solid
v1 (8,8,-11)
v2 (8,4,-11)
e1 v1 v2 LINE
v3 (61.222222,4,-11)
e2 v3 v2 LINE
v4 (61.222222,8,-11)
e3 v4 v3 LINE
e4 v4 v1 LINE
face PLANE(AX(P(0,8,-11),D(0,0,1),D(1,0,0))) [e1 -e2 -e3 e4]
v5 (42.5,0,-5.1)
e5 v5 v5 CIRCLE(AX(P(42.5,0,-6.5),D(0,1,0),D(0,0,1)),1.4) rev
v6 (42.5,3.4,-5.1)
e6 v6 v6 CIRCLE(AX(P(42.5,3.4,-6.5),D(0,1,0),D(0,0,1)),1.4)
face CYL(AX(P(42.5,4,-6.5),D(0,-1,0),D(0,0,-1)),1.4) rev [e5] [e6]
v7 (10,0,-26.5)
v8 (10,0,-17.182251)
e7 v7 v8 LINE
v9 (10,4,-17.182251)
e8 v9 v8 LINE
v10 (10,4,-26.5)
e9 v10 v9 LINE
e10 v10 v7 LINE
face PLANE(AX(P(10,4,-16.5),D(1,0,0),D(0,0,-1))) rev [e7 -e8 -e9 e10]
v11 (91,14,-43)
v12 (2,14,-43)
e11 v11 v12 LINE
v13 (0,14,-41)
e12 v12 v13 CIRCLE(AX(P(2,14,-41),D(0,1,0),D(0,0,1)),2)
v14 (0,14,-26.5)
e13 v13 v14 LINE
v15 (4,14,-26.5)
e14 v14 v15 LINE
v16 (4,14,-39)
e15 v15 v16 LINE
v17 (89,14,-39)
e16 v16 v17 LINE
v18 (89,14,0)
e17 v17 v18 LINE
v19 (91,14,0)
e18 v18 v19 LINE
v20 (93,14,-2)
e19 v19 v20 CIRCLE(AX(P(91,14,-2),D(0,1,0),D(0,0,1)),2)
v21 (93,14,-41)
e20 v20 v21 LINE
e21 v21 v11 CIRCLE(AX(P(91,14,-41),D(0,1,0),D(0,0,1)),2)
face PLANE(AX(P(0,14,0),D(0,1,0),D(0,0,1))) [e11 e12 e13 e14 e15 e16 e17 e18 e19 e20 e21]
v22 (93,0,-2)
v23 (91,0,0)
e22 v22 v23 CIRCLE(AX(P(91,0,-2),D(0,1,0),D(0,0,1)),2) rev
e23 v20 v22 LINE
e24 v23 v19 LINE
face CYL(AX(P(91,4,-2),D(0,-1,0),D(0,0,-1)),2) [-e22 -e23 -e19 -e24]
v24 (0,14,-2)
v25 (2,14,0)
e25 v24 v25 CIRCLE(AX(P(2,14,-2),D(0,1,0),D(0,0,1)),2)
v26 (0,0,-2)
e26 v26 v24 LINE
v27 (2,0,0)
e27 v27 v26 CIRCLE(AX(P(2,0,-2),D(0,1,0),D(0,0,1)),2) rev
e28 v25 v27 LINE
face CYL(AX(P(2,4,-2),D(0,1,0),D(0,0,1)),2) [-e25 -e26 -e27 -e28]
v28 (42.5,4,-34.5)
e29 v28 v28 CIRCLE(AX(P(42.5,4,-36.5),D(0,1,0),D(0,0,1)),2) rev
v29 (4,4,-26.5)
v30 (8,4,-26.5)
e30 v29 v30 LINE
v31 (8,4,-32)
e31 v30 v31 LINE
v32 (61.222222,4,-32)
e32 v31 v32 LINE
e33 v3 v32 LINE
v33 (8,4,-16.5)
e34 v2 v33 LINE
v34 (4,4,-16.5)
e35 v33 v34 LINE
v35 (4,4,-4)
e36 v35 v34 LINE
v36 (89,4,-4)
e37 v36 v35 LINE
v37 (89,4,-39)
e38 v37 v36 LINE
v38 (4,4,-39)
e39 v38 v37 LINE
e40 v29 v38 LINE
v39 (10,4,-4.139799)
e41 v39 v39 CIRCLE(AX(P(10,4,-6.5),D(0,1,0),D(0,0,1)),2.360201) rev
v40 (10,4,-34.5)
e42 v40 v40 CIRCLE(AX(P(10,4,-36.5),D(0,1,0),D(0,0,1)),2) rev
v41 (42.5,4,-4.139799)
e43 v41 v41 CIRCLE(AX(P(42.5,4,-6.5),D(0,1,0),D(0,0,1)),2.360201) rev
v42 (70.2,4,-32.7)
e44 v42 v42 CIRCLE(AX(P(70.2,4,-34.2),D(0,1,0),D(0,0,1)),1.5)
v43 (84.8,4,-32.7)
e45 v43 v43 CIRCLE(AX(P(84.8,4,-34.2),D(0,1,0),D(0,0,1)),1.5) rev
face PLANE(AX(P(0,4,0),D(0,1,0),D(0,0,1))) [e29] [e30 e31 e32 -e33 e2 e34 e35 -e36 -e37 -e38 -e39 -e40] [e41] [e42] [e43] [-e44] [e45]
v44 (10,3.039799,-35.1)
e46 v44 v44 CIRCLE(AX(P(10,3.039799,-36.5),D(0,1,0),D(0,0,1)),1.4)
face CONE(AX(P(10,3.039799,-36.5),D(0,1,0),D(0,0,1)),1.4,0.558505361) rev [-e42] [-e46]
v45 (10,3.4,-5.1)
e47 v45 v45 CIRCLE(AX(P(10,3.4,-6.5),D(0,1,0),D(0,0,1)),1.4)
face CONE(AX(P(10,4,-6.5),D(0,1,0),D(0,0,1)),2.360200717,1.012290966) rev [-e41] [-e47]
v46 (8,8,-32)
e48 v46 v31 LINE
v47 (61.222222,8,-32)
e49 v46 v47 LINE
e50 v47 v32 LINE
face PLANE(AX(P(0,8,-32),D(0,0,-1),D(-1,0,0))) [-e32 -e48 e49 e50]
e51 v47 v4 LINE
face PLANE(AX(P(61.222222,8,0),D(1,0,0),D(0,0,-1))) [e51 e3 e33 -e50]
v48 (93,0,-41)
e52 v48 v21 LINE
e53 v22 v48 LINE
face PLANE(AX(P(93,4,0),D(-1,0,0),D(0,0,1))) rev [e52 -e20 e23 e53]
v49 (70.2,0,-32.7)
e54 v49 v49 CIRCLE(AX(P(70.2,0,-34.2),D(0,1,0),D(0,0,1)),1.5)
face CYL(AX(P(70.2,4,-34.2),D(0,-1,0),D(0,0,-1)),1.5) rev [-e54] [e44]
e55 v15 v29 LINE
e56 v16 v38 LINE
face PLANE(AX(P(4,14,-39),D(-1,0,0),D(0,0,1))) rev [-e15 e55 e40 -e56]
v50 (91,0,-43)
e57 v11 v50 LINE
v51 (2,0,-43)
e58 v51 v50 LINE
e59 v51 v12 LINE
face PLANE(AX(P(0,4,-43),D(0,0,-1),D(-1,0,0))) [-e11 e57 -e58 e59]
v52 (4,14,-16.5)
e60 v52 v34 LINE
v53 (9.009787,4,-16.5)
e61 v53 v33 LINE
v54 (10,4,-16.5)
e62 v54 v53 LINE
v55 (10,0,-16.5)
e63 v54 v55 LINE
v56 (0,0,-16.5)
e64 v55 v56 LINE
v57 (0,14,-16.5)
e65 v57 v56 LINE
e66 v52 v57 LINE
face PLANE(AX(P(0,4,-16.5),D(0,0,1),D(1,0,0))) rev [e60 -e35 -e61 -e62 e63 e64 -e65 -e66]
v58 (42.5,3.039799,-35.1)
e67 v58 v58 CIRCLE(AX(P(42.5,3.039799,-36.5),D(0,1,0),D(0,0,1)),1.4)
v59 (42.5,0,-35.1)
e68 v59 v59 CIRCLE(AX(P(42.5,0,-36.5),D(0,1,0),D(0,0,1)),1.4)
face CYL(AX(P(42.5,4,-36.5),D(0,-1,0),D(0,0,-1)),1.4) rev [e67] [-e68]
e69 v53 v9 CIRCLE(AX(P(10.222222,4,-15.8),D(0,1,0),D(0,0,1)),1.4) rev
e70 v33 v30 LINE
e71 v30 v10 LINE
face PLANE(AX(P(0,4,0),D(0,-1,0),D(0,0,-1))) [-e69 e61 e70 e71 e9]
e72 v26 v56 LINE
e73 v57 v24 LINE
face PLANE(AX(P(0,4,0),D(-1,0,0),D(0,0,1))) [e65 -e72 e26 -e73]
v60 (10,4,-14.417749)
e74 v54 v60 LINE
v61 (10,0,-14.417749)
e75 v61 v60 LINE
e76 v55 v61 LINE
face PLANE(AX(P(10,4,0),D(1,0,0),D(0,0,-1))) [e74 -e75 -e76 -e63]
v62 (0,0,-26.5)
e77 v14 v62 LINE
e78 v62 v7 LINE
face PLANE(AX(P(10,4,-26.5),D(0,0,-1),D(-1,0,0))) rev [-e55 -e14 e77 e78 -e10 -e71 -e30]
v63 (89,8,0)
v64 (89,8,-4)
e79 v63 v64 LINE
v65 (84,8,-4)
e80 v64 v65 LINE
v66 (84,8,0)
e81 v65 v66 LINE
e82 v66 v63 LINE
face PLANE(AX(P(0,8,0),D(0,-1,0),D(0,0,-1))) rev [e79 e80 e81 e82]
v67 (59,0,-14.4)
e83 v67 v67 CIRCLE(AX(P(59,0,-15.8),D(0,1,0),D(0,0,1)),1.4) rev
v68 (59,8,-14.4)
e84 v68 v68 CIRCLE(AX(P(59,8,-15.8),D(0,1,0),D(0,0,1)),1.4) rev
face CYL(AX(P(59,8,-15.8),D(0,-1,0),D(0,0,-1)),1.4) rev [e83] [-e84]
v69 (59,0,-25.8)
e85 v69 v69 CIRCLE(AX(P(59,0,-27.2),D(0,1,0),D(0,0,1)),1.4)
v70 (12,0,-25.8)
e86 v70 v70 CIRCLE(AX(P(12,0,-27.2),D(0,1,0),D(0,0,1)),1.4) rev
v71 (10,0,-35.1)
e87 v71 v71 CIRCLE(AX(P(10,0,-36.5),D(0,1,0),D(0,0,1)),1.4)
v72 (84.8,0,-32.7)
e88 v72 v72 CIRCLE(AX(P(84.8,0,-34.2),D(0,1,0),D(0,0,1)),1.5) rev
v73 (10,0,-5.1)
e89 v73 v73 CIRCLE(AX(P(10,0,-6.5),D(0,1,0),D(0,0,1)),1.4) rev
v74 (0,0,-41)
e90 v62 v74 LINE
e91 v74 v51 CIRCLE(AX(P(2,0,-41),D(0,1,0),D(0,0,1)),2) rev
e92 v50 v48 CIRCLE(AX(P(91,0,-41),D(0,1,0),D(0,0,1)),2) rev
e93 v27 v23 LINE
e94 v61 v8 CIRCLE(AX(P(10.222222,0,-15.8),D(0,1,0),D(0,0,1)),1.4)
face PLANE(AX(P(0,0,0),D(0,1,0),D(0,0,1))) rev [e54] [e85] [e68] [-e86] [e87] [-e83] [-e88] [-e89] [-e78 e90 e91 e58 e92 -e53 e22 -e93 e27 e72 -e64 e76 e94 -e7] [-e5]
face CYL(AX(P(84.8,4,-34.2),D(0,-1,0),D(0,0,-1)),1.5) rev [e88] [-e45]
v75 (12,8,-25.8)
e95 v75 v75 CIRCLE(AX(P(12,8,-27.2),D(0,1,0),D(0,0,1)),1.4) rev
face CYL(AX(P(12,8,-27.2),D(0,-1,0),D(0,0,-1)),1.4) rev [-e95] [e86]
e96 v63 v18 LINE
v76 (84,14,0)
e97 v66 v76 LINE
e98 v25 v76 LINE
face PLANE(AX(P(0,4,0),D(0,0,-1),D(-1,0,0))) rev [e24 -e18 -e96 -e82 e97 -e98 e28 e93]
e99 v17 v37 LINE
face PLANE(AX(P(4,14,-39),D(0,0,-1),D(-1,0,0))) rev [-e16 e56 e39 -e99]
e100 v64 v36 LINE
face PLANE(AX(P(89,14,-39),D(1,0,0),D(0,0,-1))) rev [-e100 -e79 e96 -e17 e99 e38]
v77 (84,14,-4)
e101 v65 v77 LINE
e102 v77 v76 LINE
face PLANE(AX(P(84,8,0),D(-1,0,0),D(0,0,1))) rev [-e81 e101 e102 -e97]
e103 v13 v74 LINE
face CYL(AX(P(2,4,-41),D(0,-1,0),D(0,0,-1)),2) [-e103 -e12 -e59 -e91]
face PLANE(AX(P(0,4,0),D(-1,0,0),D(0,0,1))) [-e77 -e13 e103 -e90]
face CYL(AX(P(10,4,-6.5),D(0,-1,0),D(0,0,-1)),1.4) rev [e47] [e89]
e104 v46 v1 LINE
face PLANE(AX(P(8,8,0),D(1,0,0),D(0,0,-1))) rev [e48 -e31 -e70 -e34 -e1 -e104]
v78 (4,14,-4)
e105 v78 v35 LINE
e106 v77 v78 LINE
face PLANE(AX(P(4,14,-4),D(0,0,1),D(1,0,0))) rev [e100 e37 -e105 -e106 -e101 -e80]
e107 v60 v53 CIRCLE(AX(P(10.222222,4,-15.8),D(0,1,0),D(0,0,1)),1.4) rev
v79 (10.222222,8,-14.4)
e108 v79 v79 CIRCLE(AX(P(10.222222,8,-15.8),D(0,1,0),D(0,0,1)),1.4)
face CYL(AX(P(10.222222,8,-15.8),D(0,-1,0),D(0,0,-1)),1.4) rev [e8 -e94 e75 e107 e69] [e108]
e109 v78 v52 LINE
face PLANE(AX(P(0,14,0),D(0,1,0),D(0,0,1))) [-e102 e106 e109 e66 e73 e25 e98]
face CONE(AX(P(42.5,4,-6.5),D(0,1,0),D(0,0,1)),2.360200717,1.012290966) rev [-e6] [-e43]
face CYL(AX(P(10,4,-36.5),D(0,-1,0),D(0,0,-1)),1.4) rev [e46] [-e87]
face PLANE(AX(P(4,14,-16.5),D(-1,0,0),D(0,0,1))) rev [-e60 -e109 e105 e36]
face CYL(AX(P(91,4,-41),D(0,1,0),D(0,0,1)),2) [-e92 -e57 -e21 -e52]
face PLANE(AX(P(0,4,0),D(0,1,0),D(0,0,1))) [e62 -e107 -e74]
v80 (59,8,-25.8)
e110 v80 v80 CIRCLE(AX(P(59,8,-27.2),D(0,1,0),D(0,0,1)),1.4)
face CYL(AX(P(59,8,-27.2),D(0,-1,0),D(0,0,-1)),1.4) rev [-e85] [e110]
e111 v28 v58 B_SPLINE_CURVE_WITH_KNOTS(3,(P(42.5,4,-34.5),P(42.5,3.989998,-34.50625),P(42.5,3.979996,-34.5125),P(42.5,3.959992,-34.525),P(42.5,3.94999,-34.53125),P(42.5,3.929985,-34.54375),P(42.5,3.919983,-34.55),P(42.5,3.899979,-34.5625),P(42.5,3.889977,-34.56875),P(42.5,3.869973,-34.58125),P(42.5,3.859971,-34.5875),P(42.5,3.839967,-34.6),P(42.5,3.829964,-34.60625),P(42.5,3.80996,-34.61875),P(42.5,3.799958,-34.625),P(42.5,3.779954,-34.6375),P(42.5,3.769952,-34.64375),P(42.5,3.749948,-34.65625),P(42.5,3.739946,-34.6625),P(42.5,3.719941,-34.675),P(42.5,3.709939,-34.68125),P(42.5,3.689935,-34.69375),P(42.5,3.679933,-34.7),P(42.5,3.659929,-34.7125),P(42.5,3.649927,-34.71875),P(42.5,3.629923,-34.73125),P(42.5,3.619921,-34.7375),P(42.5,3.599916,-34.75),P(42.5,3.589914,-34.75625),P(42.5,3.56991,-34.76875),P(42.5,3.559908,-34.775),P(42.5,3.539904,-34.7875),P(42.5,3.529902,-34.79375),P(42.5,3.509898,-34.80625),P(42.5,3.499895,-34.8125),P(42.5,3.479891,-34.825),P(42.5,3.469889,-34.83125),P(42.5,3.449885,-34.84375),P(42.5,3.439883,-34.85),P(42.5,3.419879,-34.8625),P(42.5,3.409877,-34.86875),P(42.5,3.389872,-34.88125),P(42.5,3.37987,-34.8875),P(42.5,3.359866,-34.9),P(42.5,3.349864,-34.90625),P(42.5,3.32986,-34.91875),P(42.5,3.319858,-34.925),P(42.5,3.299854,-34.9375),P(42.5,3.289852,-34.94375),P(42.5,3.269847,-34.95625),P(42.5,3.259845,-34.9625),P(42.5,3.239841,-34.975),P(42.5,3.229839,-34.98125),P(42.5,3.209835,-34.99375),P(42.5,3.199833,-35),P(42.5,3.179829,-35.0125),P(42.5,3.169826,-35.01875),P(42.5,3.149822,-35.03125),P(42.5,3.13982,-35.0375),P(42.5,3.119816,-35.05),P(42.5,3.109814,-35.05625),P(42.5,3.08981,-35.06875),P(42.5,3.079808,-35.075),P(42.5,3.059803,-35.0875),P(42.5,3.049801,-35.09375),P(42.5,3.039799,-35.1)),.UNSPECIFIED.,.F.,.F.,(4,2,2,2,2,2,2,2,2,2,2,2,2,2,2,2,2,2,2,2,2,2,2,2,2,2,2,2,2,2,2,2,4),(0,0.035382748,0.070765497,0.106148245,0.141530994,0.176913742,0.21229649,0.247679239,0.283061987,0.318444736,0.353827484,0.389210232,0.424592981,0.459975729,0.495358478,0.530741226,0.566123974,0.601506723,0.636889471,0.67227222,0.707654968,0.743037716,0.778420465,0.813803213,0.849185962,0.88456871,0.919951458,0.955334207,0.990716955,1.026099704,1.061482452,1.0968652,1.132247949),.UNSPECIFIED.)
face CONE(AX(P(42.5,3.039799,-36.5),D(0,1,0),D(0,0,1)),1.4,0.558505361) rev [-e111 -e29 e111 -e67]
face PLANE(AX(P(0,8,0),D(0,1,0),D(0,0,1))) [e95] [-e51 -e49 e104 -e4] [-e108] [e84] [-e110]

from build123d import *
from OCP.BRepFilletAPI import BRepFilletAPI_MakeChamfer

# Parameters (mm, degrees)
SKETCH1_W               = 93
SKETCH1_H               = 43
SKETCH1_R               = 1.4
SKETCH1_W_2             = 51
SKETCH1_H_2             = 21
SKETCH1_W_3             = 21
SKETCH1_H_3             = 34
BOSS_EXTRUDE1_DEPTH     = 4
BOSS_EXTRUDE2_OUTLINE_W = 53.222222222
BOSS_EXTRUDE2_OUTLINE_H = 21
BOSS_EXTRUDE2_OUTLINE_R = 1.4
BOSS_EXTRUDE2_DEPTH     = 8
SKETCH1_4_W             = 21
SKETCH1_4_H             = 34
SKETCH1_4_R             = 1.5
BOSS_EXTRUDE3_DEPTH     = 4
CHAMFER1_SIZE           = 0.6
CHAMFER1_SIZE2          = 0.960200717
SKETCH2_W               = 10
SKETCH2_H               = 10
CUT_EXTRUDE1_DEPTH      = 4
BOSS_EXTRUDE4_DEPTH     = 10
FILLET1_R               = 2
SKETCH5_W               = 5
SKETCH5_H               = 4
CUT_EXTRUDE3_DEPTH      = 6


# Read off the part's stored shape, not the designer's step: Boss-Extrude2
with BuildPart() as part:
    # Sketch1 → Boss-Extrude1 (new body)
    with BuildSketch(Plane(origin=(0, 0, 0), x_dir=(1, 0, 0), z_dir=(0, 1, 0))):
        with Locations((46.5, 21.5)):
            Rectangle(SKETCH1_W, SKETCH1_H)
        with Locations(Location((10, 36.5, 0), (0, 0, 270))):
            Circle(SKETCH1_R, mode=Mode.SUBTRACT)
        with Locations(Location((42.5, 36.5, 0), (0, 0, 270))):
            Circle(SKETCH1_R, mode=Mode.SUBTRACT)
        with Locations(Location((42.5, 6.5, 0), (0, 0, 270))):
            Circle(SKETCH1_R, mode=Mode.SUBTRACT)
        with Locations(Location((10, 6.5, 0), (0, 0, 270))):
            Circle(SKETCH1_R, mode=Mode.SUBTRACT)
        with Locations((35.5, 21.5)):
            Rectangle(SKETCH1_W_2, SKETCH1_H_2, mode=Mode.SUBTRACT)
        with Locations((77.5, 21.5)):
            Rectangle(SKETCH1_W_3, SKETCH1_H_3, mode=Mode.SUBTRACT)
    extrude(amount=BOSS_EXTRUDE1_DEPTH)

    # Boss-Extrude2 outline → Boss-Extrude2 (add)
    with BuildSketch(Plane(origin=(0, 0, 0), x_dir=(1, 0, 0), z_dir=(0, 1, 0))):
        with Locations((34.611111111, 21.5)):
            Rectangle(BOSS_EXTRUDE2_OUTLINE_W, BOSS_EXTRUDE2_OUTLINE_H)
        with Locations((10.222222222, 15.8)):
            Circle(BOSS_EXTRUDE2_OUTLINE_R, mode=Mode.SUBTRACT)
        with Locations((12, 27.2)):
            Circle(BOSS_EXTRUDE2_OUTLINE_R, mode=Mode.SUBTRACT)
        with Locations((59, 27.2)):
            Circle(BOSS_EXTRUDE2_OUTLINE_R, mode=Mode.SUBTRACT)
        with Locations((59, 15.8)):
            Circle(BOSS_EXTRUDE2_OUTLINE_R, mode=Mode.SUBTRACT)
    extrude(amount=BOSS_EXTRUDE2_DEPTH)

    # Sketch1<4> → Boss-Extrude3 (add)
    with BuildSketch(Plane(origin=(0, 0, 0), x_dir=(1, 0, 0), z_dir=(0, 1, 0))):
        with Locations((77.5, 21.5)):
            Rectangle(SKETCH1_4_W, SKETCH1_4_H)
        with Locations(Location((70.2, 34.2, 0), (0, 0, 270))):
            Circle(SKETCH1_4_R, mode=Mode.SUBTRACT)
        with Locations(Location((84.8, 34.2, 0), (0, 0, 270))):
            Circle(SKETCH1_4_R, mode=Mode.SUBTRACT)
    extrude(amount=BOSS_EXTRUDE3_DEPTH)

    # Chamfer1: one chamfer whose edges measure the first distance from different faces: ONE call of the kernel's chamfer builder (chamfer() names one face for all edges)
    chamfer1_edges_1 = [part.edges().sort_by_distance(p)[0] for p in [
        (42.5, 4, -7.9),
    ]]
    chamfer1_side_1 = [part.faces().sort_by_distance(p)[0] for p in [
        (42.5, 2, -7.9),
    ]]
    chamfer1_edges_2 = [part.edges().sort_by_distance(p)[0] for p in [
        (42.5, 4, -37.9),
        (10, 4, -37.9),
    ]]
    chamfer1_side_2 = [part.faces().sort_by_distance(p)[0] for p in [
        (46.5, 4, -1.024597482),
    ]]
    chamfer1_edges_3 = [part.edges().sort_by_distance(p)[0] for p in [
        (10, 4, -7.9),
    ]]
    chamfer1_side_3 = [part.faces().sort_by_distance(p)[0] for p in [
        (10, 2, -7.9),
    ]]
    chamfer1 = BRepFilletAPI_MakeChamfer(part.part.solid().wrapped)
    for e in chamfer1_edges_1:
        chamfer1.Add(CHAMFER1_SIZE, CHAMFER1_SIZE2, e.wrapped, chamfer1_side_1[0].wrapped)  # the first distance lies on this face
    for e in chamfer1_edges_2:
        chamfer1.Add(CHAMFER1_SIZE, CHAMFER1_SIZE2, e.wrapped, chamfer1_side_2[0].wrapped)  # the first distance lies on this face
    for e in chamfer1_edges_3:
        chamfer1.Add(CHAMFER1_SIZE, CHAMFER1_SIZE2, e.wrapped, chamfer1_side_3[0].wrapped)  # the first distance lies on this face
    add(Compound.cast(chamfer1.Shape()), mode=Mode.REPLACE)

    # Sketch2 → Cut-Extrude1 (cut)
    with BuildSketch(Plane.XZ):
        with Locations((5, -21.5)):
            Rectangle(SKETCH2_W, SKETCH2_H)
    extrude(amount=-CUT_EXTRUDE1_DEPTH, mode=Mode.SUBTRACT)

    # Sketch3 → Boss-Extrude4 (add)
    with BuildSketch(Plane(origin=(0, 4, 0), x_dir=(1, 0, 0), z_dir=(0, 1, 0))):
        Polygon((4, 39), (4, 26.5), (0, 26.5), (0, 43), (93, 43), (93, 0), (0, 0), (0, 16.5), (4, 16.5), (4, 4), (89, 4), (89, 39), align=None)
    extrude(amount=BOSS_EXTRUDE4_DEPTH)

    # Fillet1
    fillet1_edges = [part.edges().sort_by_distance(p)[0] for p in [
        (0, 7, 0),
        (0, 7, -43),
        (93, 7, -43),
        (93, 7, 0),
    ]]
    fillet(fillet1_edges, radius=FILLET1_R)

    # Sketch5 → Cut-Extrude3 (cut)
    with BuildSketch(Plane(origin=(0, 14, 0), x_dir=(1, 0, 0), z_dir=(0, 1, 0))):
        with Locations((86.5, 2)):
            Rectangle(SKETCH5_W, SKETCH5_H)
    extrude(amount=-CUT_EXTRUDE3_DEPTH, mode=Mode.SUBTRACT)


solid = part.part
